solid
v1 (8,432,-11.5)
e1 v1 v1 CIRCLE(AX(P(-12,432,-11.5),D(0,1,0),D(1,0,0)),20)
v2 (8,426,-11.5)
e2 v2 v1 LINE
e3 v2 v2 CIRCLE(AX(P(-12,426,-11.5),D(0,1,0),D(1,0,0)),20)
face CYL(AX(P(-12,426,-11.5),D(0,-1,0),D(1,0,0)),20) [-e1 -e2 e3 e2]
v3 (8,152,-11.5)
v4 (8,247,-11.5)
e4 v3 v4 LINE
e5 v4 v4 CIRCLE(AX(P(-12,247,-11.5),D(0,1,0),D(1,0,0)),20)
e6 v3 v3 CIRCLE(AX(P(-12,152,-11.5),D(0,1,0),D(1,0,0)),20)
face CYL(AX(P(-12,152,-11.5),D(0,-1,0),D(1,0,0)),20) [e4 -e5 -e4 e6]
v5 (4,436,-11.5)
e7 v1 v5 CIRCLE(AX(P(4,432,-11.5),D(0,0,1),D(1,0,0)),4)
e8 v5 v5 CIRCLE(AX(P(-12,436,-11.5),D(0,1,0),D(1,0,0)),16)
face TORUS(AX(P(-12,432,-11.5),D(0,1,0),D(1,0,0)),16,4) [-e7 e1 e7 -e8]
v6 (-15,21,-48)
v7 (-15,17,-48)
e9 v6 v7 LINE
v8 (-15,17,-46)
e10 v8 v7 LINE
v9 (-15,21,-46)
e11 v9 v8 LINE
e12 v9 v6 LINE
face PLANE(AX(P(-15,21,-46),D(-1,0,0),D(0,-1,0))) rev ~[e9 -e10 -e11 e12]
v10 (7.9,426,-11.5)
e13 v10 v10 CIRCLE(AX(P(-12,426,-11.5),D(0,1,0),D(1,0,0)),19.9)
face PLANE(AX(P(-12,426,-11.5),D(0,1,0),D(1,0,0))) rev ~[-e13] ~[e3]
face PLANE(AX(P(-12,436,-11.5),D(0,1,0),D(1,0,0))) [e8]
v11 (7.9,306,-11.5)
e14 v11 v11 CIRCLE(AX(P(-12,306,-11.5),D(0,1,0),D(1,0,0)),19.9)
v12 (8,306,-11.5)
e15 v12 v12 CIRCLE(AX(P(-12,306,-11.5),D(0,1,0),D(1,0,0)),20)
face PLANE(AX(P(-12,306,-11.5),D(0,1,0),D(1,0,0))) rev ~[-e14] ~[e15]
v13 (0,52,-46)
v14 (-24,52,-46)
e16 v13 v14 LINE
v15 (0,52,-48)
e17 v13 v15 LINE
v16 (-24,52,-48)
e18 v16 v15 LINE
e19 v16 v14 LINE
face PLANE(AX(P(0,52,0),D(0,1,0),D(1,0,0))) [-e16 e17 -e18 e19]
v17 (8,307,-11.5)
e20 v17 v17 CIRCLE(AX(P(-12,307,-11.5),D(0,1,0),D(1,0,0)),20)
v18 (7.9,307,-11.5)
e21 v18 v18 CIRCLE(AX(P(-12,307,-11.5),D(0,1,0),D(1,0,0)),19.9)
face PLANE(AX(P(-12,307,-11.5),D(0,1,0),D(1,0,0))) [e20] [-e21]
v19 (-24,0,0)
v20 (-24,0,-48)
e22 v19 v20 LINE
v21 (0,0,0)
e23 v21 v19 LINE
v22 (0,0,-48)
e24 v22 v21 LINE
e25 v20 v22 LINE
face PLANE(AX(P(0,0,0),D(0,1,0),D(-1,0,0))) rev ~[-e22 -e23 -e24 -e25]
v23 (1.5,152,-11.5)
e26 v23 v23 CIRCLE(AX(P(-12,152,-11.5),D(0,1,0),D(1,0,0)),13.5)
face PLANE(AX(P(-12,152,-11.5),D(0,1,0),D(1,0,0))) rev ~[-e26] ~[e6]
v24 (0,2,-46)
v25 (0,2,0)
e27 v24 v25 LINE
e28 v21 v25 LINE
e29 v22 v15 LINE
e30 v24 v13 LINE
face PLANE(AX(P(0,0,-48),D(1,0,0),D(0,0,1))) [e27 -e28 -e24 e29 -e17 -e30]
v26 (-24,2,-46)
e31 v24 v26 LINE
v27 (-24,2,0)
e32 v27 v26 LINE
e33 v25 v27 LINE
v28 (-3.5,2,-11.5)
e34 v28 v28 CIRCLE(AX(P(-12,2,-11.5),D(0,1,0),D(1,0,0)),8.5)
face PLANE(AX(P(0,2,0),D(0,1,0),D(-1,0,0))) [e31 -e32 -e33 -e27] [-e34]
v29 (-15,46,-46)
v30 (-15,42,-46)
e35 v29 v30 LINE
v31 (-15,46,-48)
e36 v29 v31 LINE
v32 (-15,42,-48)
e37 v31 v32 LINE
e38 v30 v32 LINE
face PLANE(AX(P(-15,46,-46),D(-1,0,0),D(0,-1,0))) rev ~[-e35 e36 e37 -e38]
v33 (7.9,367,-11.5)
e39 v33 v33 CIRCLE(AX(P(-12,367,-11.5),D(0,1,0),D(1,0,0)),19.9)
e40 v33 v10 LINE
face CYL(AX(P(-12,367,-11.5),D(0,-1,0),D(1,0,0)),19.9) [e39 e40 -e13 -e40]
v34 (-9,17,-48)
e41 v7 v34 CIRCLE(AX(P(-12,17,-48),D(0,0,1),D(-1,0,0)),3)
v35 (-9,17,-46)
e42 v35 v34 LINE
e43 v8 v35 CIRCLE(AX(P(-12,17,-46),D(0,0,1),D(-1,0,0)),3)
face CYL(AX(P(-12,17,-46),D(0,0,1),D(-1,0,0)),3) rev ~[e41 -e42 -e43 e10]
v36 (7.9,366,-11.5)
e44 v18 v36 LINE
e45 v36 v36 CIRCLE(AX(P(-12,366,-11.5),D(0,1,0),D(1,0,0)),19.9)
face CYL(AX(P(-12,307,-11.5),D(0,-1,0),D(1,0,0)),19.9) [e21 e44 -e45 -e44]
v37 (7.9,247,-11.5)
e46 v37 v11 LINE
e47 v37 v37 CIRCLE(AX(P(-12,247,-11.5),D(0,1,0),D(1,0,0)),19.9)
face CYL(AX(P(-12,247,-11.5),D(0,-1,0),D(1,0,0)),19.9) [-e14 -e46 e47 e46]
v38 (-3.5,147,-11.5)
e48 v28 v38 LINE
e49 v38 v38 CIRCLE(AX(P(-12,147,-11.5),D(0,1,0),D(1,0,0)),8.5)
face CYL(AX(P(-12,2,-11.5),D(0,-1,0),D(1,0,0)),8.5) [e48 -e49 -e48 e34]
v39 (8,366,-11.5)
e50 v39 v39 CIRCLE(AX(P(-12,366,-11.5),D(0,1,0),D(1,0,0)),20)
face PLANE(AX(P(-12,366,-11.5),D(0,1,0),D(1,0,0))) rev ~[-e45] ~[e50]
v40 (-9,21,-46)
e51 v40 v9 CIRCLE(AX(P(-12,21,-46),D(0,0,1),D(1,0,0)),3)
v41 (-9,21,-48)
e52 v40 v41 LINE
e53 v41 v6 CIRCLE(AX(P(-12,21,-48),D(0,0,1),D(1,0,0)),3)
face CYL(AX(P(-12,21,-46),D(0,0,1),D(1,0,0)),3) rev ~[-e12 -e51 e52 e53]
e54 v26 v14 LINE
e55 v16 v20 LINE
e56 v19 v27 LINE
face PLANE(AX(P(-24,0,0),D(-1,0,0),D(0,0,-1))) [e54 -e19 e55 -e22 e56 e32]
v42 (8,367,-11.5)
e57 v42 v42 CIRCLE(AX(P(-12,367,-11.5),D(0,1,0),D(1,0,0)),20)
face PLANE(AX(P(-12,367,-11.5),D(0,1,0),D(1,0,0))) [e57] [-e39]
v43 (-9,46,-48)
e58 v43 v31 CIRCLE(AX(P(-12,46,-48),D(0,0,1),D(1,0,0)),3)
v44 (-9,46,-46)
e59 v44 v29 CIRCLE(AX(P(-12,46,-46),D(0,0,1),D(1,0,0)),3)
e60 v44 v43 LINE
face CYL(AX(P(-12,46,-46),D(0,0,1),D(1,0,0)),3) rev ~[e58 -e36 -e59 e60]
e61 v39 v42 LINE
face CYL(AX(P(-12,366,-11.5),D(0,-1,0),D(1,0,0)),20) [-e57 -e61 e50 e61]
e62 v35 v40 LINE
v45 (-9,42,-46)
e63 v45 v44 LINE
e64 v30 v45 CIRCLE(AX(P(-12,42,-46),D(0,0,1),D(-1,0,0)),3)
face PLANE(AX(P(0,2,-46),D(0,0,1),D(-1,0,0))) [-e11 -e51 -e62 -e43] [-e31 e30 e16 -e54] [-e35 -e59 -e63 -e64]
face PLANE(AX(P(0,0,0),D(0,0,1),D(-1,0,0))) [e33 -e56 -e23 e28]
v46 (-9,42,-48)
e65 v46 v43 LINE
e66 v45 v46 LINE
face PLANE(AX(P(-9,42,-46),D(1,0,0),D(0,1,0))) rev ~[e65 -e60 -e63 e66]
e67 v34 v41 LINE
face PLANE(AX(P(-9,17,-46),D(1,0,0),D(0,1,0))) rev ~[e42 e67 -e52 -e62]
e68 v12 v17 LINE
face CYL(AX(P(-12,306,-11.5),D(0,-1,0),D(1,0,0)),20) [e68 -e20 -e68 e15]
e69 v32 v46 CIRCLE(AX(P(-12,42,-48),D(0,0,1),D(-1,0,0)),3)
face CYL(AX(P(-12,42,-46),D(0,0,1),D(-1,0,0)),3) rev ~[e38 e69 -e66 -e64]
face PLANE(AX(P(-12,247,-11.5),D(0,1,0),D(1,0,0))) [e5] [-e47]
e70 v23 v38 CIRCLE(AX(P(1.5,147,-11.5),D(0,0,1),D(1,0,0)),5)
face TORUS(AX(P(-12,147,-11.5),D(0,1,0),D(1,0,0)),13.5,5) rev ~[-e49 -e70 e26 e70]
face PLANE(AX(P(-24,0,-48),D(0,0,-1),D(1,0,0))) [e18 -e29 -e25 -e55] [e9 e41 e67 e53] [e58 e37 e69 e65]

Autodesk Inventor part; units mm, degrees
ref_plane "YZ Plane" through (0, 0, 0) normal (1, 0, 0) x (0, 1, 0)
ref_plane "XZ Plane" through (0, 0, 0) normal (0, 1, 0) x (-1, 0, 0)
ref_plane "XY Plane" through (0, 0, 0) normal (0, 0, 1) x (1, 0, 0)
sketch "Sketch1" plane through (0, 0, 0) normal (0, 1, 0) x (-1, 0, 0)
  line L0 (0, 0) -> (24, 0)
  line L1 (24, 0) -> (24, -48)
  line L2 (24, -48) -> (0, -48)
  line L3 (0, -48) -> (0, 0)
  line L4 (12, 0) -> (12, -48) construction
  circle A0 centre (12, -12) radius 9 construction
  dimension "d0" = 18
  dimension "d1" = 3
  dimension "d2" = 3
  dimension "d3" = 48
extrude "Extrusion1" add sketch "Sketch1" along normal blind 2
sketch "Sketch2" plane through (0, 2, 0) normal (0, 1, 0) x (1, 0, 0)
  line L0 (-24, 48) -> (-24, 0) projected
  line L1 (0, 0) -> (0, 48) projected
  line L2 (-24, 48) -> (0, 48)
  line L3 (0, 48) -> (0, 46)
  line L4 (0, 46) -> (-24, 46)
  line L5 (-24, 46) -> (-24, 48)
  dimension "d6" = 2
extrude "Extrusion2" add sketch "Sketch2" along normal blind 50
sketch "Sketch3" plane through (-24, 2, -46) normal (0, 0, 1) x (1, 0, 0)
  line L0 (24, 50) -> (0, 50) construction
  line L1 (12, 50) -> (12, 0) construction
  line L2 (0, 0) -> (24, 0) construction
  line L3 (12, 47) -> (12, 37) construction
  line L4 (9, 44) -> (9, 40)
  line L5 (15, 40) -> (15, 44)
  arc A0 (15, 44) -> (9, 44) centre (12, 44) ccw
  arc A1 (9, 40) -> (15, 40) centre (12, 40) ccw
  line L6 (12, 22) -> (12, 12) construction
  line L7 (9, 19) -> (9, 15)
  line L8 (15, 15) -> (15, 19)
  arc A2 (15, 19) -> (9, 19) centre (12, 19) ccw
  arc A3 (9, 15) -> (15, 15) centre (12, 15) ccw
  point P0 (24, -2)
  point P1 (12, 42)
  point P2 (12, 17)
  dimension "d9" = 6
  dimension "d10" = 10
  dimension "d11" = 3
  dimension "d12" = 10
  dimension "d13" = 6
  dimension "d14" = 15
extrude "Extrusion3" cut sketch "Sketch3" against normal up to next
sketch "Sketch4" plane through (0, 2, 0) normal (0, 1, 0) x (1, 0, 0)
  line L0 (-24, 0) -> (0, 0) construction
  line L1 (-12, 0) -> (-12, 46) construction
  line L2 (-9, 46) -> (-15, 46) construction
  circle A0 centre (-12, 11.5) radius 8.5
  dimension "d17" = 17
  dimension "d18" = 3
extrude "Extrusion4" add sketch "Sketch4" along normal blind 150
sketch "Sketch5" plane through (-12, 152, -11.5) normal (0, 1, 0) x (1, 0, 0)
  circle A0 centre (0, 0) radius 8.5 projected
  circle A1 centre (0, 0) radius 20
  point P0 (12, -11.5)
  dimension "d21" = 40
extrude "Extrusion5" add sketch "Sketch5" along normal blind 95 contours A0 | A1
sketch "Sketch6" plane through (-12, 247, -11.5) normal (0, 1, 0) x (1, 0, 0)
  circle A0 centre (0, 0) radius 20 projected
  circle A1 centre (0, 0) radius 19.9
  point P0 (12, -11.5)
  dimension "d24" = 0.1
sketch "Sketch6 outline for Extrusion6" plane through (-12, 247, -11.5) normal (0, 1, 0) x (1, 0, 0)
  circle A0 centre (0, 0) radius 19.9
extrude "Extrusion6" add sketch "Sketch6 outline for Extrusion6" along normal blind 59
sketch "Sketch7" plane through (-12, 306, -11.5) normal (0, 1, 0) x (1, 0, 0)
  circle A0 centre (0, 0) radius 19.9 projected
  circle A1 centre (0, 0) radius 20
  point P0 (12, -11.5)
  dimension "d27" = 0.1
extrude "Extrusion7" add sketch "Sketch7" along normal blind 1 contours A0 | A1
sketch "Sketch8" plane through (-12, 307, -11.5) normal (0, 1, 0) x (1, 0, 0)
  circle A0 centre (0, 0) radius 19.9 projected
  point P0 (12, -11.5)
extrude "Extrusion8" add sketch "Sketch8" along normal blind 59
sketch "Sketch9" plane through (-12, 366, -11.5) normal (0, 1, 0) x (1, 0, 0)
  circle A0 centre (0, 0) radius 19.9 projected
  circle A1 centre (0, 0) radius 20 projected
  point P0 (12, -11.5)
extrude "Extrusion9" add sketch "Sketch9" along normal blind 1 contours A0 | A1
sketch "Sketch10" plane through (-12, 367, -11.5) normal (0, 1, 0) x (1, 0, 0)
  circle A0 centre (0, 0) radius 19.9 projected
  point P0 (12, -11.5)
extrude "Extrusion10" add sketch "Sketch10" along normal blind 59
sketch "Sketch11" plane through (-12, 426, -11.5) normal (0, 1, 0) x (1, 0, 0)
  circle A0 centre (0, 0) radius 20 projected
  point P0 (12, -11.5)
extrude "Extrusion11" add sketch "Sketch11" along normal blind 10
fillet "Fillet1" radius 4 1 edges at (-32, 436, -11.5)
fillet "Fillet2" radius 5 1 edges at (-20.5, 152, -11.5)
equation "\"d2\" = d1"
properties part number "Signal Tower"
